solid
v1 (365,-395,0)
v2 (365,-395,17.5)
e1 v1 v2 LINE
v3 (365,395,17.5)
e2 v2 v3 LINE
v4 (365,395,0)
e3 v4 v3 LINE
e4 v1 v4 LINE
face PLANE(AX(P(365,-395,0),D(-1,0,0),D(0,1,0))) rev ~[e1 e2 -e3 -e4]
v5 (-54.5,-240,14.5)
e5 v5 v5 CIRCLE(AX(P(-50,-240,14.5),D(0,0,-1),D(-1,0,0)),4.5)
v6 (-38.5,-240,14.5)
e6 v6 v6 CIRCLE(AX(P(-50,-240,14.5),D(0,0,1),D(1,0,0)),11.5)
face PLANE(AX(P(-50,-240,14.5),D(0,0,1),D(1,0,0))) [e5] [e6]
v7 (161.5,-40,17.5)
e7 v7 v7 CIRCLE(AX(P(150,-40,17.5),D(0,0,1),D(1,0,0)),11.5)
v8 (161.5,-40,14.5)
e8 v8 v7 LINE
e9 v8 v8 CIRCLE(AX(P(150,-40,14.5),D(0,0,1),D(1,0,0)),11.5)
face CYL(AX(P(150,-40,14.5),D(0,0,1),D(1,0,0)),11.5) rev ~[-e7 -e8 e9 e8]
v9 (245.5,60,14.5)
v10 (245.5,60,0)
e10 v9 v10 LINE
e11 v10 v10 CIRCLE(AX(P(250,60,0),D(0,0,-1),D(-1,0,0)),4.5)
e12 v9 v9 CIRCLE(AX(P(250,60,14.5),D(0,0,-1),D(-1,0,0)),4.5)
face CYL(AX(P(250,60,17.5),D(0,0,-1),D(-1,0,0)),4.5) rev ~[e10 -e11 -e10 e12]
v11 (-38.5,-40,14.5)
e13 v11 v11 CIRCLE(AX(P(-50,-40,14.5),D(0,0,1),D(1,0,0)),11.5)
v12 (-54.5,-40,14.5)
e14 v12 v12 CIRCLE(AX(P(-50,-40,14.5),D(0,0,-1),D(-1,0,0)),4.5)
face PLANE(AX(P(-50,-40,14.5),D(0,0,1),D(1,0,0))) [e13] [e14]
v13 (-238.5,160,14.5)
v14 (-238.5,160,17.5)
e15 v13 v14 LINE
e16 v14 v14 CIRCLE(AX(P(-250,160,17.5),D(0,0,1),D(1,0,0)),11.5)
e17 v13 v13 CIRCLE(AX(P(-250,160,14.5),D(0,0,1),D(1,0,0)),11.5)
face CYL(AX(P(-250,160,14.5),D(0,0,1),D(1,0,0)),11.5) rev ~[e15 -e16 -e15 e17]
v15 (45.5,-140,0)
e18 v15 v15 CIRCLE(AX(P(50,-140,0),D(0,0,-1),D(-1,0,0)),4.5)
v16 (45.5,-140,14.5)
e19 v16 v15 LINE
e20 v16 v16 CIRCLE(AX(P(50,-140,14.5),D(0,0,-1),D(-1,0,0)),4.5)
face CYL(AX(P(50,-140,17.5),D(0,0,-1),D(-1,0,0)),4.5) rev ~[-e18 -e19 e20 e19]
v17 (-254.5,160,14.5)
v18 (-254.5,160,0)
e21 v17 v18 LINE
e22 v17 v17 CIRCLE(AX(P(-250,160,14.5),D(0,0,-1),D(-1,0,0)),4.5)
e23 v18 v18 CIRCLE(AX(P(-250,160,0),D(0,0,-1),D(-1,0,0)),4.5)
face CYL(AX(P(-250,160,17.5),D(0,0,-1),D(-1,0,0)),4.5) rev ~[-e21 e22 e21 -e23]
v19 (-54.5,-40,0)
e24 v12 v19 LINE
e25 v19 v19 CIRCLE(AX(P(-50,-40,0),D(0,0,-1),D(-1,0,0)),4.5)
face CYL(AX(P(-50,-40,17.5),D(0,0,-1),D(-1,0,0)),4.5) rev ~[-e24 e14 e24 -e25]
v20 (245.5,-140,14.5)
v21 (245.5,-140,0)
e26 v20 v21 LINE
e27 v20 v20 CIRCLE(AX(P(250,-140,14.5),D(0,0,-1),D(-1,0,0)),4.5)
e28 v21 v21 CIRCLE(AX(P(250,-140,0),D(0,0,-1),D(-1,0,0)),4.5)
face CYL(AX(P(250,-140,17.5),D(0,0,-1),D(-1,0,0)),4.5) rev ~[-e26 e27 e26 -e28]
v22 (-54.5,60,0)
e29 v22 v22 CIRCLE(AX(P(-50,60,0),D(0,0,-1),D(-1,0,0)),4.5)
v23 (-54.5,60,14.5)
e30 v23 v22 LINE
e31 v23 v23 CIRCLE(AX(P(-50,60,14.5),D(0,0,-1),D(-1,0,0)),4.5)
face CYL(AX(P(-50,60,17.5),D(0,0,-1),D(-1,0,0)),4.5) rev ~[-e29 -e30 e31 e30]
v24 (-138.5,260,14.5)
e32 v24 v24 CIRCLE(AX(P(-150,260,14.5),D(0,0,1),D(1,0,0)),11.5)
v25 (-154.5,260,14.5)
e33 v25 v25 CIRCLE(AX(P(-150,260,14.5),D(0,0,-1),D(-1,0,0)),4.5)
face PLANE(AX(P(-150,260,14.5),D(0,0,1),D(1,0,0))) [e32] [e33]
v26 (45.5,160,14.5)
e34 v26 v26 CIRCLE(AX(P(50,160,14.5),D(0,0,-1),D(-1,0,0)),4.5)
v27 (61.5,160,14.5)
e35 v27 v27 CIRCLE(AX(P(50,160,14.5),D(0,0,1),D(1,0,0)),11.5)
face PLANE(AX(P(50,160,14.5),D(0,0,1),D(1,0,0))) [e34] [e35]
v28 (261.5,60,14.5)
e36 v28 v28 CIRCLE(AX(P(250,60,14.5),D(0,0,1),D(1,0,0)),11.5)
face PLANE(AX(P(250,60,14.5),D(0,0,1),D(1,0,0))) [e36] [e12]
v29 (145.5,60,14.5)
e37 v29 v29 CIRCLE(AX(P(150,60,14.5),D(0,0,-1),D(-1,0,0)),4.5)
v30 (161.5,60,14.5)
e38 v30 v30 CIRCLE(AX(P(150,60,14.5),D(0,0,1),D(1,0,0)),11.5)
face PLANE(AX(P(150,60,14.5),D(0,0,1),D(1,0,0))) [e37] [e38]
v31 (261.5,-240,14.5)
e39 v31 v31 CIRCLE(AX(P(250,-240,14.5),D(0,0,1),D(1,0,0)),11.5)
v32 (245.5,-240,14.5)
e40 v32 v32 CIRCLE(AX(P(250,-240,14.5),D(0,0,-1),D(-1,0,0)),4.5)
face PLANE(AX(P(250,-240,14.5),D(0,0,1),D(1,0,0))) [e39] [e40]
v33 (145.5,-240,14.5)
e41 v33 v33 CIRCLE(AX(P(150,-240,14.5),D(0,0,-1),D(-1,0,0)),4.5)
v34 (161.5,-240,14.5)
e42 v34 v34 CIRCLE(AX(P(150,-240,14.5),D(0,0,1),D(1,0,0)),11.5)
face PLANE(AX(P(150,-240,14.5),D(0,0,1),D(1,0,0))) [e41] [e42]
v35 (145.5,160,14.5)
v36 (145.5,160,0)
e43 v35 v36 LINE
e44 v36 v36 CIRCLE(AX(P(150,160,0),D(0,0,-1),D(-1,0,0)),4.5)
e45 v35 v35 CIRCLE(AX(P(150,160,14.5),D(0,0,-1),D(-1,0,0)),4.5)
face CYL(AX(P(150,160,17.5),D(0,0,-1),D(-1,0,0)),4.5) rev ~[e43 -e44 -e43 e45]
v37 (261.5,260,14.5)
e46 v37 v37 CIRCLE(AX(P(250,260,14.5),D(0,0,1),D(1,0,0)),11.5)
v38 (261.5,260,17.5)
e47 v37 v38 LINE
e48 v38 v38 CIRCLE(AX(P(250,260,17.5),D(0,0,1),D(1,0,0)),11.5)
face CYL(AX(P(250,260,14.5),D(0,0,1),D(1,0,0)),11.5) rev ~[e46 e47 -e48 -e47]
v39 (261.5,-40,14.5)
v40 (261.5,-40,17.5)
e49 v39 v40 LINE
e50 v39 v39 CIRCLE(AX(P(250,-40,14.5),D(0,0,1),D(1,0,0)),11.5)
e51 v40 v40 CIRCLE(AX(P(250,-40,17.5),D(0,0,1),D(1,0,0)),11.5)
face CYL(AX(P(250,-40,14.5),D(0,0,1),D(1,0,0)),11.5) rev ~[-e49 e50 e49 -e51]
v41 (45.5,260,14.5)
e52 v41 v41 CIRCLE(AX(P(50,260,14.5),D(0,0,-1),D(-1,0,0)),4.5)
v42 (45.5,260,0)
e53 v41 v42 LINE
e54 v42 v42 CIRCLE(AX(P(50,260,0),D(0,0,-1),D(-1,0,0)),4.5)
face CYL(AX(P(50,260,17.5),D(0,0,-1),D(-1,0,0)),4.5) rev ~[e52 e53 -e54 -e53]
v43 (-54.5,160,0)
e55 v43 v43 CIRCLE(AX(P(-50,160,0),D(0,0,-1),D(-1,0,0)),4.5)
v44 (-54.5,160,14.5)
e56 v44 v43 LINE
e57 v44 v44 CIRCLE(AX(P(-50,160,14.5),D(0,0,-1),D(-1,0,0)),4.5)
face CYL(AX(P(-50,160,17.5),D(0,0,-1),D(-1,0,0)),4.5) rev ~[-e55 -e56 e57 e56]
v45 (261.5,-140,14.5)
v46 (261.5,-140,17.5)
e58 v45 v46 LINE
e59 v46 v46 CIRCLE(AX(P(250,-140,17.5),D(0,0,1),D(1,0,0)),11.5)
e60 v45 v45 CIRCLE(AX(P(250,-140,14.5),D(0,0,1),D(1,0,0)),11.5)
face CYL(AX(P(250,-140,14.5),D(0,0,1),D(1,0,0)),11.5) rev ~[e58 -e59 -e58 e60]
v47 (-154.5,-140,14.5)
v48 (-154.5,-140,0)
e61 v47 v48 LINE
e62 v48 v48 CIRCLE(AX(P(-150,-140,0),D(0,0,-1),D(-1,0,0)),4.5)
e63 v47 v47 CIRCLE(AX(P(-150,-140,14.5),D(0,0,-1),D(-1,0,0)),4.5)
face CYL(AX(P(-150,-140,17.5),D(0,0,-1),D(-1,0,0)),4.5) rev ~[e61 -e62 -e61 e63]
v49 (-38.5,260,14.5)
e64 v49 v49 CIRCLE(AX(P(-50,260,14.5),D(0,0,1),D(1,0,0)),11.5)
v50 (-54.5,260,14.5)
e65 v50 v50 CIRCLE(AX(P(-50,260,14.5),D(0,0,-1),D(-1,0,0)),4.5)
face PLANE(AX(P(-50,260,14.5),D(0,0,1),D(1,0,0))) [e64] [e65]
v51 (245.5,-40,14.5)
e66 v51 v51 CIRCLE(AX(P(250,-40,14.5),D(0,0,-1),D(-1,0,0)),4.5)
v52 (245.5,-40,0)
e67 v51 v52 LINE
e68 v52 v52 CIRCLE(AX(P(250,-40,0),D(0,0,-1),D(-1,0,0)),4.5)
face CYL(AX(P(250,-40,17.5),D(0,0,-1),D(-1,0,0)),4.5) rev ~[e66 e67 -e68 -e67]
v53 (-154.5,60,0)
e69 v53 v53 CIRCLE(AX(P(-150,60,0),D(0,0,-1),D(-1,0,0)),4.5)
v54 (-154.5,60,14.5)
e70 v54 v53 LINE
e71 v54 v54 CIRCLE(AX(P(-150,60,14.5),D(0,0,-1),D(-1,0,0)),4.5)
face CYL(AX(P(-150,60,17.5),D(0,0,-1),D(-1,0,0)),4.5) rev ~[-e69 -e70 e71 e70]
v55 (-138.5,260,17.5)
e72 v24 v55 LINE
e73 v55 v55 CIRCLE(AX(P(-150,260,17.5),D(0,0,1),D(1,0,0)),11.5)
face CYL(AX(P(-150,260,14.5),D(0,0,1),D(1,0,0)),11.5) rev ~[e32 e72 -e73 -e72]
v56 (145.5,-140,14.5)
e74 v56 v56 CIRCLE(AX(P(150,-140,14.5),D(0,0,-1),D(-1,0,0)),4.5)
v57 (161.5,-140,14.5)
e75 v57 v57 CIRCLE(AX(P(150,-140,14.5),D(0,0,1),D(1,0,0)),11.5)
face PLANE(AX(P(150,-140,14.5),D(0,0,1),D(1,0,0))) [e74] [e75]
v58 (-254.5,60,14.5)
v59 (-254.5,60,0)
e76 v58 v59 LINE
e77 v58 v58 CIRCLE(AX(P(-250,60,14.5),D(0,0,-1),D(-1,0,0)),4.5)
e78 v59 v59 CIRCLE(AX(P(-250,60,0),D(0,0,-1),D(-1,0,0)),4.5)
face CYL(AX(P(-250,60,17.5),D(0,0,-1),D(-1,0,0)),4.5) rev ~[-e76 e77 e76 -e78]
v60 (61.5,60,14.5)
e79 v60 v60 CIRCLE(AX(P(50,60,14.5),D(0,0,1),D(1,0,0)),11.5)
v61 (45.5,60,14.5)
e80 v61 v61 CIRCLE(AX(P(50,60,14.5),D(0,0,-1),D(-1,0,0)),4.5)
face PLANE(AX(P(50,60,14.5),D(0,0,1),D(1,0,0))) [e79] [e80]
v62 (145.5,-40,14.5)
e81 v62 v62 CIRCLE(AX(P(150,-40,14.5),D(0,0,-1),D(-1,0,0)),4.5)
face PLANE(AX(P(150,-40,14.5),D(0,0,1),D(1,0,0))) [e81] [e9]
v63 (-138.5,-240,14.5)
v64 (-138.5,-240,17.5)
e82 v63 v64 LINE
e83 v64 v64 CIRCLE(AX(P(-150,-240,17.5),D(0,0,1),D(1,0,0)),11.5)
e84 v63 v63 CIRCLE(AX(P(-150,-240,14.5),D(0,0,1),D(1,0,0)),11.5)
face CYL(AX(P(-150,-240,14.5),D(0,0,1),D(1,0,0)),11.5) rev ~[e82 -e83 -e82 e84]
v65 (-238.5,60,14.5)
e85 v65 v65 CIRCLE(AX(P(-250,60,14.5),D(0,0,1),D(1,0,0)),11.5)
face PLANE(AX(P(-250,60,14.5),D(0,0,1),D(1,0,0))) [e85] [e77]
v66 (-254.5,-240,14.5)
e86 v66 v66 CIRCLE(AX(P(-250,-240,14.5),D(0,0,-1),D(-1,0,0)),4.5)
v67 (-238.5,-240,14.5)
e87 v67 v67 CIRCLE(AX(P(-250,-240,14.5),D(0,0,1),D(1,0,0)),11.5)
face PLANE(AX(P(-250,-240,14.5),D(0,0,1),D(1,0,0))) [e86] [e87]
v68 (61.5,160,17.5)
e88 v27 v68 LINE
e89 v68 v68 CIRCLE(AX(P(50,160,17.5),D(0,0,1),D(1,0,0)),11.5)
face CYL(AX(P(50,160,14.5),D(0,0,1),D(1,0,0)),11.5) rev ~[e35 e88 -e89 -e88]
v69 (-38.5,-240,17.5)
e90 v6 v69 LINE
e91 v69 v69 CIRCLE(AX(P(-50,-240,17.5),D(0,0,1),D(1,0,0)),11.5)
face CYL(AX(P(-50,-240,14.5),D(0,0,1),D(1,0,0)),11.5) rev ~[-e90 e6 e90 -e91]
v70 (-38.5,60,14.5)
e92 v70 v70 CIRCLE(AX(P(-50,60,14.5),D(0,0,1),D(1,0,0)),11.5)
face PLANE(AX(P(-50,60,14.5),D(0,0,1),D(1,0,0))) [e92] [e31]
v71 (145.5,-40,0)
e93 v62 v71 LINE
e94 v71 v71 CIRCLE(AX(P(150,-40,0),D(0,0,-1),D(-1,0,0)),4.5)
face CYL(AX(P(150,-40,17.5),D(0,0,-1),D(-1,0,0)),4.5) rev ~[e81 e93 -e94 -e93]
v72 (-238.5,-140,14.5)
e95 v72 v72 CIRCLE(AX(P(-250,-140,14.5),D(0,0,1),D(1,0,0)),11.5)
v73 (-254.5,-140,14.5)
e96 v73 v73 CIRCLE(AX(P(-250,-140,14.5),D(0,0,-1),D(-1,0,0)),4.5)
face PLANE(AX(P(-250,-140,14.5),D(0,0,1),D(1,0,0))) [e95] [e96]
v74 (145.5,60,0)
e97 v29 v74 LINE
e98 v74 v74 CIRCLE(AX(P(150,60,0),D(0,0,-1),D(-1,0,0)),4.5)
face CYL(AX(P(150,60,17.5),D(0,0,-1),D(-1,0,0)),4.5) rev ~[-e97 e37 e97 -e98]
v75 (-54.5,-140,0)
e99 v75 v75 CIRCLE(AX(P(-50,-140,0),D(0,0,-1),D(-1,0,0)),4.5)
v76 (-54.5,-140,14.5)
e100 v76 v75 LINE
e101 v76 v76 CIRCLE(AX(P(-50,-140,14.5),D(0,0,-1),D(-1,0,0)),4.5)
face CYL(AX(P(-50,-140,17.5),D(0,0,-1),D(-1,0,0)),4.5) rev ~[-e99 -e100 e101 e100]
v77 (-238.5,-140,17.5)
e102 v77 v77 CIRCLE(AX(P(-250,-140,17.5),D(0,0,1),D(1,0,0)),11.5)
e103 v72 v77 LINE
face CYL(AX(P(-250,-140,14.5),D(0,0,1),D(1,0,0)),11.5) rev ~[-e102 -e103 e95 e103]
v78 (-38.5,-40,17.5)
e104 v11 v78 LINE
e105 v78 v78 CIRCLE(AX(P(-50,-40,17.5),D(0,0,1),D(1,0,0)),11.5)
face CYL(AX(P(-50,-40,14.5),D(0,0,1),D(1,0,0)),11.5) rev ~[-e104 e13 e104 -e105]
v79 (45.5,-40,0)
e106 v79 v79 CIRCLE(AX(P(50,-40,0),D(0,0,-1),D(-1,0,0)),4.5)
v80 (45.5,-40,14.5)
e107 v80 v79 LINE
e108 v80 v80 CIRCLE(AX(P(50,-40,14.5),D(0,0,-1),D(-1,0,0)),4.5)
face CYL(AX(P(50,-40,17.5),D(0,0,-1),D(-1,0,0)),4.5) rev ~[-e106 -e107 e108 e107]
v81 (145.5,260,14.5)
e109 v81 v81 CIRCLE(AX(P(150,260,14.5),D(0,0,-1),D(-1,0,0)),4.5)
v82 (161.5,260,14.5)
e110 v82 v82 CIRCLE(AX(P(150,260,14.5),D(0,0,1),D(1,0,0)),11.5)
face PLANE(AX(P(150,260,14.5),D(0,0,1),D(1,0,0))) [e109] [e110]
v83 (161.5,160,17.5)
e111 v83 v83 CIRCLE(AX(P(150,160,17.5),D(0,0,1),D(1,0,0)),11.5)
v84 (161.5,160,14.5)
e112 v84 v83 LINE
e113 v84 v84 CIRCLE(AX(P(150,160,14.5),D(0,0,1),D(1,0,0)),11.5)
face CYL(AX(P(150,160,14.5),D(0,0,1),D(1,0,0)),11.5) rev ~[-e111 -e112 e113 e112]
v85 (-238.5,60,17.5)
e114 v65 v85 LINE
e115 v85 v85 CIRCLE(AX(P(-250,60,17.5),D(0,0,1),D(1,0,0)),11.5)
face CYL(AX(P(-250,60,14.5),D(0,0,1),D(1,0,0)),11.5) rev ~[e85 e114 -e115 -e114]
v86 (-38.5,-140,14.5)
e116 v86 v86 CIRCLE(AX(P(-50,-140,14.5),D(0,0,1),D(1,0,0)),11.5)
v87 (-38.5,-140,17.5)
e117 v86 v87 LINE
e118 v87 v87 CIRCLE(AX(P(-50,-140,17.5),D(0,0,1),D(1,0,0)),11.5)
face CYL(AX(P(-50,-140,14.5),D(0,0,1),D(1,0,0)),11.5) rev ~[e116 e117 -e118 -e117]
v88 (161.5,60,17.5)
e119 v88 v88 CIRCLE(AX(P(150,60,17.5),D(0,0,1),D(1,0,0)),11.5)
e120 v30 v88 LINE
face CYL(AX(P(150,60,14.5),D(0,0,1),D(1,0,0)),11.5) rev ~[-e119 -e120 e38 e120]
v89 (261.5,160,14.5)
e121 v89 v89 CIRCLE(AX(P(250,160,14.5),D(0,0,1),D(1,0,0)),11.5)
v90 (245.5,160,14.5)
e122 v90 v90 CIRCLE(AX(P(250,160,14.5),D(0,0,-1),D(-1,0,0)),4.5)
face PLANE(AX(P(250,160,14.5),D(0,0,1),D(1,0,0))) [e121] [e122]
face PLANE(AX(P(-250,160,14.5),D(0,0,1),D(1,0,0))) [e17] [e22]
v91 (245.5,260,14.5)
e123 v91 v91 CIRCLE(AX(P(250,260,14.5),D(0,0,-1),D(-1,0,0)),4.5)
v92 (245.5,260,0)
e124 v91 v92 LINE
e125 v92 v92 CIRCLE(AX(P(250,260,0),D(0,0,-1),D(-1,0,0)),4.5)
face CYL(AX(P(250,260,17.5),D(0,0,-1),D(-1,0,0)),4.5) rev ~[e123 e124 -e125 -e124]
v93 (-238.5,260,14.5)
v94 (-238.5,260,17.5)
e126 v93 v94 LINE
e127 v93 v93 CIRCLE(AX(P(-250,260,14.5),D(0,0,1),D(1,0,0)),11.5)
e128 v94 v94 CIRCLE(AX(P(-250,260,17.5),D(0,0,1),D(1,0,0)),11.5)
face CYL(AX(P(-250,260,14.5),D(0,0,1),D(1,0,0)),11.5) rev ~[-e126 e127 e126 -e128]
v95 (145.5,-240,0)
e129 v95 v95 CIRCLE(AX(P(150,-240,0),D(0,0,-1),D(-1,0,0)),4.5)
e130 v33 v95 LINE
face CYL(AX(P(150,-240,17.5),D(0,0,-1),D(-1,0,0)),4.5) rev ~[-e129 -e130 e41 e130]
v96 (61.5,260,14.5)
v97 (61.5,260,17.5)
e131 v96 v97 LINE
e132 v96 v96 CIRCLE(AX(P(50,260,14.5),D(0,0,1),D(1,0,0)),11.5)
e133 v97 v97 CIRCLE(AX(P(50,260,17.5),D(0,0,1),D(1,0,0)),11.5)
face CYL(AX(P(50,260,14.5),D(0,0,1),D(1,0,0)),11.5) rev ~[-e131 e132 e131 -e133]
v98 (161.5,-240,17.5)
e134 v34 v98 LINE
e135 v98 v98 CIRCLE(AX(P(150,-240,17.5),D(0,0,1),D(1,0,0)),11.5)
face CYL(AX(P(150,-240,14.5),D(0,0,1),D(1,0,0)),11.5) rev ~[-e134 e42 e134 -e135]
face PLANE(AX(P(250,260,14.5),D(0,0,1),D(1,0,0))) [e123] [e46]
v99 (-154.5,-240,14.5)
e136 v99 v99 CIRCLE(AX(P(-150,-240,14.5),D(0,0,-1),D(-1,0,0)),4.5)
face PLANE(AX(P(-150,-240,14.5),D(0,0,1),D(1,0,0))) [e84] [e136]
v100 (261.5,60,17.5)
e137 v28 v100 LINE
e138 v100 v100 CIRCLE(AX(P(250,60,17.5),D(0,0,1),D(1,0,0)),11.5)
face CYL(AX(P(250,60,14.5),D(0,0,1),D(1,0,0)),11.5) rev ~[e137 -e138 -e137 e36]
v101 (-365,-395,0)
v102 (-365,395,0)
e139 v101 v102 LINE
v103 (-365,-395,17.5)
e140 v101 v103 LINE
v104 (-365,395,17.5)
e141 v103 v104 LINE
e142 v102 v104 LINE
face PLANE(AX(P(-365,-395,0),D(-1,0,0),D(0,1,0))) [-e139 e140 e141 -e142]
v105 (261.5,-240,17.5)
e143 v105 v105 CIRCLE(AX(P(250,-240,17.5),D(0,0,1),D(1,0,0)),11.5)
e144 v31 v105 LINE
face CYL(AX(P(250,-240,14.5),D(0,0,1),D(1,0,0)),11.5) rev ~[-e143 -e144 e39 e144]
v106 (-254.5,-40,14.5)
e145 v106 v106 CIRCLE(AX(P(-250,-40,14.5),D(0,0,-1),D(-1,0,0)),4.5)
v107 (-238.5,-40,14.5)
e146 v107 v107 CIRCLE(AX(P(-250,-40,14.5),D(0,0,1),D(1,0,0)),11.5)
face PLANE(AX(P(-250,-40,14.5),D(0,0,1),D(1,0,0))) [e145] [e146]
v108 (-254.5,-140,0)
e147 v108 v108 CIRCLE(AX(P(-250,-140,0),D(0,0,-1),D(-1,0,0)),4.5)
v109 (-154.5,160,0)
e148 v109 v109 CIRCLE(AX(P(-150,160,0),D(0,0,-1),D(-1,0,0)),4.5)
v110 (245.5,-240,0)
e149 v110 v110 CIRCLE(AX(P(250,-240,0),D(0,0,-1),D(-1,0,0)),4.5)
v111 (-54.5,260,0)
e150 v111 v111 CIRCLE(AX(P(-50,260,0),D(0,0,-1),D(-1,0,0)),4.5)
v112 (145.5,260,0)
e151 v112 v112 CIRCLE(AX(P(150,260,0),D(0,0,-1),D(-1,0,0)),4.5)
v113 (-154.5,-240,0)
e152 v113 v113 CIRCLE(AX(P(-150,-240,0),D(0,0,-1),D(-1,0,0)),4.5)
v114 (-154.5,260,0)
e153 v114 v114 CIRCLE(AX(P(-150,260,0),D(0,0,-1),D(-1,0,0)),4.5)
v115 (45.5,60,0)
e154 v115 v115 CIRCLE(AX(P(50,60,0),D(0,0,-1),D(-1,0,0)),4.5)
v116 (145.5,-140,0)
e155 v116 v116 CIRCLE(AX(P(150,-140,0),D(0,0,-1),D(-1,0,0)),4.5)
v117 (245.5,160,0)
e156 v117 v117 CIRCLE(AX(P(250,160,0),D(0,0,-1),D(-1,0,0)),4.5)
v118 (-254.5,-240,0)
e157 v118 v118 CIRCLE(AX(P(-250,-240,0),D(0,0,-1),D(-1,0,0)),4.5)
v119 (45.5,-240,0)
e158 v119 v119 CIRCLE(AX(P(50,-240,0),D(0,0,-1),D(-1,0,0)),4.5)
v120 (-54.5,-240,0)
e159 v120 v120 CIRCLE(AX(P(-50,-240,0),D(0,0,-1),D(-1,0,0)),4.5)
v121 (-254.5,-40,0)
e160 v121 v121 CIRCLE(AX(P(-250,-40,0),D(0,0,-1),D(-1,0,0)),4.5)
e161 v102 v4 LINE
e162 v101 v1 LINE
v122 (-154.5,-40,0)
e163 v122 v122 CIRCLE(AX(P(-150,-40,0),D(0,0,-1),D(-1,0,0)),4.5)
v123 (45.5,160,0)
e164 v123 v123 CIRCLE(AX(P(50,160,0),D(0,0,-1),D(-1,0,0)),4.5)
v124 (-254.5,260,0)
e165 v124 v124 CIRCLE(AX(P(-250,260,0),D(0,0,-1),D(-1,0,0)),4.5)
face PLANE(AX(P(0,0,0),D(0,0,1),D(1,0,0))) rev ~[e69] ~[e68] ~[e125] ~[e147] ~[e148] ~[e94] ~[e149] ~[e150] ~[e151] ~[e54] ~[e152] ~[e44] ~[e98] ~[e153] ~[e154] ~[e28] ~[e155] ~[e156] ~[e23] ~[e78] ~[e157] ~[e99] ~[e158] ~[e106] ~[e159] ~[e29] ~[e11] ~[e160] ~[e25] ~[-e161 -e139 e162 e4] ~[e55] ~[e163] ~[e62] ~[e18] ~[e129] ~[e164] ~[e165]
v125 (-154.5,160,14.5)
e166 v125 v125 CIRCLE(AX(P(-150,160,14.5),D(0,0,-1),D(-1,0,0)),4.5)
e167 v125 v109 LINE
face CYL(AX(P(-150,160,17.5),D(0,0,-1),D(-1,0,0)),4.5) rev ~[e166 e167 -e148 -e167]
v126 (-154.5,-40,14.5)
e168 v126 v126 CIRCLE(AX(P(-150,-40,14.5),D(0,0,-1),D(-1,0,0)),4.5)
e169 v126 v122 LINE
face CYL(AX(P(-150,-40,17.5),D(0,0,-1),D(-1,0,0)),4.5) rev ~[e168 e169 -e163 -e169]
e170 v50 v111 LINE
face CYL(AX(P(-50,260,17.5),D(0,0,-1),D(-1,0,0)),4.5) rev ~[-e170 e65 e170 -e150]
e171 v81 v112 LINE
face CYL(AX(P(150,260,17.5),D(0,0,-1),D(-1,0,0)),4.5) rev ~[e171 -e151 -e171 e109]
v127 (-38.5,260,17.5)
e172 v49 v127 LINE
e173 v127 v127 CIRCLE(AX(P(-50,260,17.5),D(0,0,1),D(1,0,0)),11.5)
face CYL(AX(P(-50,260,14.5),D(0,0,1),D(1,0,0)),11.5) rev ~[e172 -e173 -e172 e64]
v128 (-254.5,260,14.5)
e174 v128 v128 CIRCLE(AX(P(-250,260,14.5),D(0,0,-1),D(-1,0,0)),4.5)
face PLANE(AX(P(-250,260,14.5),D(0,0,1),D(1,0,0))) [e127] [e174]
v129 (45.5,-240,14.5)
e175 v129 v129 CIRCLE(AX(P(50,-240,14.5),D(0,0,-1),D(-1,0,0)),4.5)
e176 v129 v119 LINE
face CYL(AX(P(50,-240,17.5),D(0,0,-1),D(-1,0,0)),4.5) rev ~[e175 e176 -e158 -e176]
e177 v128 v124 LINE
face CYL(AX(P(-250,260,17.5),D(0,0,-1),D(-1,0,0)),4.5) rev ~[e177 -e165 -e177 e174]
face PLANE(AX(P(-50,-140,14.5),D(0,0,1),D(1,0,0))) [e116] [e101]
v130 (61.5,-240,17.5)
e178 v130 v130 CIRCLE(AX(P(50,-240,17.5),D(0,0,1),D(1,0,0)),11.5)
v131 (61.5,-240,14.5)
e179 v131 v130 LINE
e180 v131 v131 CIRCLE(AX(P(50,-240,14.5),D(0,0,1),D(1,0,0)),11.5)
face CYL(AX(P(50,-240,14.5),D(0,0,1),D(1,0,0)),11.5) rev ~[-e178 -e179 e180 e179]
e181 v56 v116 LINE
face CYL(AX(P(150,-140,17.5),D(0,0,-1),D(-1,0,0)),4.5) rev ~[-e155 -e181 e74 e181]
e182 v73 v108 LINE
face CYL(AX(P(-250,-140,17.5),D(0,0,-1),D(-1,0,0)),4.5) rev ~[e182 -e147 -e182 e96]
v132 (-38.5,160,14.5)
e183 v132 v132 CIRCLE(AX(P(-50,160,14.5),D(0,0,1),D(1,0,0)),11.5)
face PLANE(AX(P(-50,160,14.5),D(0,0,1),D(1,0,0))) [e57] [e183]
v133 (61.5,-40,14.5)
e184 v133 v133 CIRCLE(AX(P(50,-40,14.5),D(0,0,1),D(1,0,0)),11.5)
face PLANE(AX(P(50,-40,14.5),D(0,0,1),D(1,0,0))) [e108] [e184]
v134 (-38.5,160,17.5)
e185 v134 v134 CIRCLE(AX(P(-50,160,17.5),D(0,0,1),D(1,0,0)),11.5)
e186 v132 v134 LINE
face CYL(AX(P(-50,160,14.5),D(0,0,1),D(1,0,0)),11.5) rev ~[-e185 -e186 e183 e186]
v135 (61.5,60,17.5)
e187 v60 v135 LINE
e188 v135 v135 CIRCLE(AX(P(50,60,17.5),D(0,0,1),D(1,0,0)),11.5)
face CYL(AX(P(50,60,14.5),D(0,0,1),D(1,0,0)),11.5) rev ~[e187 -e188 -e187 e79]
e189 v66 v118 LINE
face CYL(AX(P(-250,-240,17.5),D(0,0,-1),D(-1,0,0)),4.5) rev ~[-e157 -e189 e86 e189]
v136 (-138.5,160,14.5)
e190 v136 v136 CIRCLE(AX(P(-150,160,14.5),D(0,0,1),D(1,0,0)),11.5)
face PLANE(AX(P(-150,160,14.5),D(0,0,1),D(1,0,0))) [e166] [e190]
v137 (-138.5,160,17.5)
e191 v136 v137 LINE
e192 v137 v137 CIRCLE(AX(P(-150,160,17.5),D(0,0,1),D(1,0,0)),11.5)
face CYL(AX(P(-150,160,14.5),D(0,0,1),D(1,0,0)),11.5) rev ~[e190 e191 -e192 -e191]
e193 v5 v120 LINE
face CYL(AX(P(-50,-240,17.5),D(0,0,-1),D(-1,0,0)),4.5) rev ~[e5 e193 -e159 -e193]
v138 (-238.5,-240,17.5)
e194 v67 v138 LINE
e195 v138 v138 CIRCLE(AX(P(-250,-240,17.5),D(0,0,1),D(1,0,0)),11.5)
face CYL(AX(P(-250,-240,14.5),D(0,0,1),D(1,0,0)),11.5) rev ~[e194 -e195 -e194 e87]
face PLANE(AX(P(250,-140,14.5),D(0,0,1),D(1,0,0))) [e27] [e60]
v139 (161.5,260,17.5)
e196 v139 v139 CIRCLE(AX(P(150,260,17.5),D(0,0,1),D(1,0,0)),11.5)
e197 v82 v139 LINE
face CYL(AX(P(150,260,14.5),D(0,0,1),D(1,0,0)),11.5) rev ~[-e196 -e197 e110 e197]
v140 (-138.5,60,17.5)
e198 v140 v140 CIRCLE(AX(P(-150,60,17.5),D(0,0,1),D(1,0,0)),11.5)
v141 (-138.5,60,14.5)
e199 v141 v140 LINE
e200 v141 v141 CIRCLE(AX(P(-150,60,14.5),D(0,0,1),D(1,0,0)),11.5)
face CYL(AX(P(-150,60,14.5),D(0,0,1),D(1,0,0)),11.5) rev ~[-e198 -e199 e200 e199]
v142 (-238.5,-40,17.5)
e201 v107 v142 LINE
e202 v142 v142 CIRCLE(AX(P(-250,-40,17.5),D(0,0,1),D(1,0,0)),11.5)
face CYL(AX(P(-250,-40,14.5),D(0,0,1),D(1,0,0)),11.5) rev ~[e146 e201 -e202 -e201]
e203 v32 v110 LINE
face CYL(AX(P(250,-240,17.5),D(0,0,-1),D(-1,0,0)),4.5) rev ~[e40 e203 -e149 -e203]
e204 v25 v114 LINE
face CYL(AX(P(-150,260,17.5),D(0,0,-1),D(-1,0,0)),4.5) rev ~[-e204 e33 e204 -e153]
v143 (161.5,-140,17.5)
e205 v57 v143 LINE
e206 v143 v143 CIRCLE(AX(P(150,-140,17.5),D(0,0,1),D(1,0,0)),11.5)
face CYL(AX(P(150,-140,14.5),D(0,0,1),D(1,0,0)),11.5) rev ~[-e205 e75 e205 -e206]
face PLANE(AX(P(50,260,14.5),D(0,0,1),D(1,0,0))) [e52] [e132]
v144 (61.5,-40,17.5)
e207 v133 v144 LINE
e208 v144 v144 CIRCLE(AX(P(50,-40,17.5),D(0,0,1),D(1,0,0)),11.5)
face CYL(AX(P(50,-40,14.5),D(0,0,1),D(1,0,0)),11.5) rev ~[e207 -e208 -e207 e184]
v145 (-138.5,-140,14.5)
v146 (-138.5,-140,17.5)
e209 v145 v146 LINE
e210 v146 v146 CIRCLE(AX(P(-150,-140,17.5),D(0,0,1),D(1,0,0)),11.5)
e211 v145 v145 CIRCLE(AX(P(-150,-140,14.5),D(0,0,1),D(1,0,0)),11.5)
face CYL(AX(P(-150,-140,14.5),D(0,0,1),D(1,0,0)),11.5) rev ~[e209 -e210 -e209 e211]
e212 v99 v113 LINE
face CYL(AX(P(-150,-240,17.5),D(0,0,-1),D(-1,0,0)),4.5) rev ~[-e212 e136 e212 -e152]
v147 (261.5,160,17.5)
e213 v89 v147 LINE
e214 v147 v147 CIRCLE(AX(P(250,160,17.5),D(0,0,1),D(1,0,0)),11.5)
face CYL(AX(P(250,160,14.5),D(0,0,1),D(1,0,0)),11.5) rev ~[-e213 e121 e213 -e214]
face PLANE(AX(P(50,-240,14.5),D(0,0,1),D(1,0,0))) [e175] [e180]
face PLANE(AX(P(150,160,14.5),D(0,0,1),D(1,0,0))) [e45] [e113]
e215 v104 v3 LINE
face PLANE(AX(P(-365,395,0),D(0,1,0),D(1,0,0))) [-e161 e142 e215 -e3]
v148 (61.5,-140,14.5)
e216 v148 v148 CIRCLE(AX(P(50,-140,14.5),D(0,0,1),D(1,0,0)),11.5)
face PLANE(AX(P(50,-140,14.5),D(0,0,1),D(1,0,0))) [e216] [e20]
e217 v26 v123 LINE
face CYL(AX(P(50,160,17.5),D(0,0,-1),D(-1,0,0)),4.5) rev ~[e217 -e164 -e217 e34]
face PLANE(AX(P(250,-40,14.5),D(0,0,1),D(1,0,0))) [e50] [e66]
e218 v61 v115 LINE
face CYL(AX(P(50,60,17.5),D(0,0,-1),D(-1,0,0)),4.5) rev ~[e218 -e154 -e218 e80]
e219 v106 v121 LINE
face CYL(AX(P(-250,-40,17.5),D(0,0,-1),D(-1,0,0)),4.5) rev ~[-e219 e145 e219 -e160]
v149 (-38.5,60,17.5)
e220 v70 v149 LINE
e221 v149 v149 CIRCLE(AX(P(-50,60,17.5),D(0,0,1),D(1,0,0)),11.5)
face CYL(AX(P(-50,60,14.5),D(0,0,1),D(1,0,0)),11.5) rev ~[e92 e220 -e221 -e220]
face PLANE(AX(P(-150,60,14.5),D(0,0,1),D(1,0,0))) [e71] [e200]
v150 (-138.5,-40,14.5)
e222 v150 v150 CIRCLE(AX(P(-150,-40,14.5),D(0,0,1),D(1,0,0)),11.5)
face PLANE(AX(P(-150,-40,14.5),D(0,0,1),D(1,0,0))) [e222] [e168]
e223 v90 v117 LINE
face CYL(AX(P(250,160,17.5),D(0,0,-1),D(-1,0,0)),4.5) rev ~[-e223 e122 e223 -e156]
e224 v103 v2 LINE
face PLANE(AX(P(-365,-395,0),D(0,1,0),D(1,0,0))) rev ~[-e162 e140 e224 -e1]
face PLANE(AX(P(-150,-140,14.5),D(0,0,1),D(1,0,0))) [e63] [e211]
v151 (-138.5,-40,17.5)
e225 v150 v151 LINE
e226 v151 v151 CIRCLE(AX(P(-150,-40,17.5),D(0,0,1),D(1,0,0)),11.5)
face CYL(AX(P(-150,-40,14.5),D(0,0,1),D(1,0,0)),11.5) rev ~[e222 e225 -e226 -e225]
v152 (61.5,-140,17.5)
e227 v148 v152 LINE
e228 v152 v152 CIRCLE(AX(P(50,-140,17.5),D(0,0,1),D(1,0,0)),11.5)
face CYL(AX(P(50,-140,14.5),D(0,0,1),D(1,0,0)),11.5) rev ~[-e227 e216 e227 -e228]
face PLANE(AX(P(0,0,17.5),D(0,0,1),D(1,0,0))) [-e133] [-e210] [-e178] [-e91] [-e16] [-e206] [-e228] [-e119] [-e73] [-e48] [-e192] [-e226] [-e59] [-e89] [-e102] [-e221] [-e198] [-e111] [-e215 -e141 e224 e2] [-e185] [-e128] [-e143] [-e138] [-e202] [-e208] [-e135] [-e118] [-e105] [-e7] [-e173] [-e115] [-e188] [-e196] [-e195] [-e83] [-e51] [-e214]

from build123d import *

# Parameters (mm, degrees)
F0_W           = 730
F0_H           = 790
F1_DEPTH       = 17.5
F3_D           = 9
F3_CBORE_D     = 23
F3_CBORE_DEPTH = 3


# Not quite as in the source:
# - a feature names something its author has since deleted; it is built from what else it names


with BuildPart() as f1:
    # F0 (on Top) → F1 (new body)
    with BuildSketch(Plane.XY):
        Rectangle(F0_W, F0_H)
    extrude(amount=F1_DEPTH)

    # F3 (through all)
    with Locations(Plane.XY.offset(17.5)):
        with Locations((-250, 260), (-150, 260), (-50, 260), (50, 260), (150, 260), (-150, 160), (-250, 60), (-250, 160), (150, 60), (-150, -140), (-150, -40), (150, -140), (50, -140), (-150, 60), (-50, 60), (-50, -140), (-250, -140), (50, 160), (50, -40), (-250, -40), (150, 160), (150, -40), (-50, 160), (-50, -40), (50, 60), (250, 260), (250, 160), (250, 60), (250, -40), (250, -140), (250, -240), (150, -240), (50, -240), (-50, -240), (-150, -240), (-250, -240)):
            CounterBoreHole(F3_D / 2, F3_CBORE_D / 2, F3_CBORE_DEPTH)


solid = f1.part
